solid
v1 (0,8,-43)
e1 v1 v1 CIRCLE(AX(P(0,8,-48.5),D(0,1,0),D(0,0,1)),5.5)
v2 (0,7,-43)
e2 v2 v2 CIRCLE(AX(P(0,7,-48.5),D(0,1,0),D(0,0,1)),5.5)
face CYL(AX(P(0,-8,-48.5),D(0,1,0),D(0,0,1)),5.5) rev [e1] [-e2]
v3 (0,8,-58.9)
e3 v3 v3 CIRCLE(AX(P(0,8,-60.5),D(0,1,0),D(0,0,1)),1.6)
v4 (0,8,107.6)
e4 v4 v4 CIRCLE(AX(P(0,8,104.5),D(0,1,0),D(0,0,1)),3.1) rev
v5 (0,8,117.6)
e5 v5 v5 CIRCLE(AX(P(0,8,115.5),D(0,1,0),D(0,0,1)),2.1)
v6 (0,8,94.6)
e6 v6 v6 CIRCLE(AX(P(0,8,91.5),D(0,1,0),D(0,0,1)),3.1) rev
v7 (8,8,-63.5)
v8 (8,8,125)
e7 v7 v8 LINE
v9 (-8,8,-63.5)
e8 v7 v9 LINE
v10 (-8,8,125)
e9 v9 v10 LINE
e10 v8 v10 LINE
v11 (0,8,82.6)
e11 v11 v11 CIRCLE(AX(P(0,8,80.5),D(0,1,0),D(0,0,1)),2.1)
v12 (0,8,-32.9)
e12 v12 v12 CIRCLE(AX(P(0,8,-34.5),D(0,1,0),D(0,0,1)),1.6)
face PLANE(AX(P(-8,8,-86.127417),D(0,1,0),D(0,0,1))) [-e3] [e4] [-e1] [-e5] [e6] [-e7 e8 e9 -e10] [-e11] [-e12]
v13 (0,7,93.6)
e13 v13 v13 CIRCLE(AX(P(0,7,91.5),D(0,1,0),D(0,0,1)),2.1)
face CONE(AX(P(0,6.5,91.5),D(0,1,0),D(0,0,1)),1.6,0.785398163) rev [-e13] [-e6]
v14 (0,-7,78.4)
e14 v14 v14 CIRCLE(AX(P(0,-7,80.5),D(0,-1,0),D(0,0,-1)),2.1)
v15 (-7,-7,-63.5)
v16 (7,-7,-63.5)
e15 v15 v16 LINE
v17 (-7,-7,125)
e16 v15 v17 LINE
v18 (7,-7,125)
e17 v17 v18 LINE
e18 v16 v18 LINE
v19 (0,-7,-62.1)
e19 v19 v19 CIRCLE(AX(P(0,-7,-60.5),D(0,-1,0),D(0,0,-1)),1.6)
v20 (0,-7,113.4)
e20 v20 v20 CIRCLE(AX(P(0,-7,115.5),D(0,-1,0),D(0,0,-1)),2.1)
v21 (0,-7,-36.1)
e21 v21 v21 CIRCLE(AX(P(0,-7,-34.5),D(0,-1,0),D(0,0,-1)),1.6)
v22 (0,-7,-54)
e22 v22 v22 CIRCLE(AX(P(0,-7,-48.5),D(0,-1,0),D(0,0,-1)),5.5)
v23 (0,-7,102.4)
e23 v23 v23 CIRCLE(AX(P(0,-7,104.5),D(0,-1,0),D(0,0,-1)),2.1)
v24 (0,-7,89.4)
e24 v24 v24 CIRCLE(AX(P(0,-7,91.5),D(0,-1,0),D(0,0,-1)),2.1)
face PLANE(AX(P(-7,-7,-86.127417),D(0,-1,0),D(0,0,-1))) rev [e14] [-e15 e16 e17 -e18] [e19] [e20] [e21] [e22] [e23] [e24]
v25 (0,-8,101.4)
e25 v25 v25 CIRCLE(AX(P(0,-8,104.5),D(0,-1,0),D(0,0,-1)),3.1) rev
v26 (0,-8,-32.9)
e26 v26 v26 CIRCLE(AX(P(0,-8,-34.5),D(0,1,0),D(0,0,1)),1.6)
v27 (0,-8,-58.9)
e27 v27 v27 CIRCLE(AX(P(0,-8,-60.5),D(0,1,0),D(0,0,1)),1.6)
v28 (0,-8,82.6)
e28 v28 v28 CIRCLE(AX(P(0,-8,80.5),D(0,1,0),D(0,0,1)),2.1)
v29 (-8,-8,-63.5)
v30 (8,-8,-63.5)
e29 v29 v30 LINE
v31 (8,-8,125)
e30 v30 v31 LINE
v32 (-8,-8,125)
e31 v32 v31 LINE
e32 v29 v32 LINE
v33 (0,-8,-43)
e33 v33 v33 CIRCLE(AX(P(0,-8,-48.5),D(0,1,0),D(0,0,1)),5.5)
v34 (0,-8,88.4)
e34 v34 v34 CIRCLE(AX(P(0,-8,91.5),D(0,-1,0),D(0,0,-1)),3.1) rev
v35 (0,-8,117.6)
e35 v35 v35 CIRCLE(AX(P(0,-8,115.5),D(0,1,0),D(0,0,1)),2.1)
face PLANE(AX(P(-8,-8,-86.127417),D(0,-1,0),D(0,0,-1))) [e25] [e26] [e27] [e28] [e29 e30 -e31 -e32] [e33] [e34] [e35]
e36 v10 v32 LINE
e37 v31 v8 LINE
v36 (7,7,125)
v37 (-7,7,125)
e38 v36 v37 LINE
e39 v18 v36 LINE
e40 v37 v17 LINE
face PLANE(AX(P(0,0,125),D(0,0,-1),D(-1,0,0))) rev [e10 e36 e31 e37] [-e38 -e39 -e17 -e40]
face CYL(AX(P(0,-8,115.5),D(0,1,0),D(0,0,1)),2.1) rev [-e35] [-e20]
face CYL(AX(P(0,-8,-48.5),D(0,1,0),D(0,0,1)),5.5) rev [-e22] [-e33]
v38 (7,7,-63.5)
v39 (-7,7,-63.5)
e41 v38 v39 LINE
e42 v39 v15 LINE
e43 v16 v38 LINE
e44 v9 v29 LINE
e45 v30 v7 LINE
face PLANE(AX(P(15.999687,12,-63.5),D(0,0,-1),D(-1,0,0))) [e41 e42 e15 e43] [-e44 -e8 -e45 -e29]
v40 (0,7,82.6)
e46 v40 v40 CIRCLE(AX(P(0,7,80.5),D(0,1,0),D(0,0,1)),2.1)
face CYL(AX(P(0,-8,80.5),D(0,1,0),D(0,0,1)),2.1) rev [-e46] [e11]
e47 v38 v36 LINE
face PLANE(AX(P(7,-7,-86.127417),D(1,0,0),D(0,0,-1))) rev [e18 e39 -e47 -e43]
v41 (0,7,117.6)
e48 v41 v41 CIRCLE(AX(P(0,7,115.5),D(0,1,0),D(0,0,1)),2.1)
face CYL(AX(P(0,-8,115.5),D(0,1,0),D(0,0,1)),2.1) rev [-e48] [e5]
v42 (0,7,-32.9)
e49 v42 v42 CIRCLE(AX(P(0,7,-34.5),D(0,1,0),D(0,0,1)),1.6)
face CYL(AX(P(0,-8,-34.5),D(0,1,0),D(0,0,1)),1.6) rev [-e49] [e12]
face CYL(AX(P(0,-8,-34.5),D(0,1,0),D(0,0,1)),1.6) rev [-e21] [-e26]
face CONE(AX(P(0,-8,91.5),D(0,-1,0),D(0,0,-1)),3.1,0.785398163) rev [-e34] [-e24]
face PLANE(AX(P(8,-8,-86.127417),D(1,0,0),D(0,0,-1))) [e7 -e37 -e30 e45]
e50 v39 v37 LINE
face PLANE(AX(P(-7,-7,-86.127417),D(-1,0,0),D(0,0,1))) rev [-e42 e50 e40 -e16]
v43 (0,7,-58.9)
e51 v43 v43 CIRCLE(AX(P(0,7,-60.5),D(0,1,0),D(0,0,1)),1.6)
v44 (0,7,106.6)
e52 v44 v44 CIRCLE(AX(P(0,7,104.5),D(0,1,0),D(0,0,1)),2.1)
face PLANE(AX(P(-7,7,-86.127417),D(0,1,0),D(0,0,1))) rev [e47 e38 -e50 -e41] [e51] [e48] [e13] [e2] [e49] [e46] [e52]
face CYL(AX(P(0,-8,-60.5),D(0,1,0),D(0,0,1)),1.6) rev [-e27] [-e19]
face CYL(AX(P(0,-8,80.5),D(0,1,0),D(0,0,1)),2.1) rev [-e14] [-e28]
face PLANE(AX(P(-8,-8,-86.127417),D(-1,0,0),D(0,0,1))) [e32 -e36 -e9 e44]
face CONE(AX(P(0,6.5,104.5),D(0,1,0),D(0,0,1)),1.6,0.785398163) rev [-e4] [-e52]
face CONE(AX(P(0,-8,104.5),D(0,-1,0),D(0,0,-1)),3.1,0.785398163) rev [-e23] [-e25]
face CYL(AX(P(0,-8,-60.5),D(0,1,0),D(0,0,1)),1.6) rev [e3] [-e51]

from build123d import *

# Parameters (mm, degrees)
BOSS_EXTRUDE1_DEPTH      = 125
BOSS_EXTRUDE1_DEPTH_BACK = 63.5
SKETCH1_W                = 16
SKETCH1_H                = 16
SKETCH1_W_2              = 14
SKETCH1_H_2              = 14
SKETCH2_R                = 2.1
SKETCH2_R_2              = 1.6
SKETCH2_R_3              = 5.5
CUT_EXTRUDE1_DEPTH       = 127.273512662
CHAMFER1_SIZE            = 1.5


with BuildPart() as part:
    # Sketch1 → Boss-Extrude1 (new, two sides: drawn at the far end of the back side and taken through both)
    with BuildSketch(Plane.XY.offset(-BOSS_EXTRUDE1_DEPTH_BACK)):
        Rectangle(SKETCH1_W, SKETCH1_H)
        Rectangle(SKETCH1_W_2, SKETCH1_H_2, mode=Mode.SUBTRACT)
    extrude(amount=BOSS_EXTRUDE1_DEPTH + BOSS_EXTRUDE1_DEPTH_BACK)

    # Sketch2 → Cut-Extrude1 (cut, through all)
    with BuildSketch(Plane(origin=(0, 8, 0), x_dir=(1, 0, 0), z_dir=(0, 1, 0))):
        with Locations(Location((0, -115.5, 0), (0, 0, 270))):
            Circle(SKETCH2_R)
        with Locations(Location((0, -104.5, 0), (0, 0, 270))):
            Circle(SKETCH2_R_2)
        with Locations(Location((0, 48.5, 0), (0, 0, 270))):
            Circle(SKETCH2_R_3)
        with Locations(Location((0, 60.5, 0), (0, 0, 270))):
            Circle(SKETCH2_R_2)
        with Locations(Location((0, 34.5, 0), (0, 0, 270))):
            Circle(SKETCH2_R_2)
        with Locations(Location((0, -80.5, 0), (0, 0, 270))):
            Circle(SKETCH2_R)
        with Locations(Location((0, -91.5, 0), (0, 0, 270))):
            Circle(SKETCH2_R_2)
    extrude(amount=-CUT_EXTRUDE1_DEPTH, mode=Mode.SUBTRACT)

    # Chamfer1
    # the kernel refuses this chamfer: 1.5 mm, written as the material it takes off along each edge
    with BuildSketch(Plane(origin=(0, 8, 104.5), x_dir=(0, 0, 1), z_dir=(-1, 0, 0))) as chamfer1_piece_1:
        Polygon((1.6 + CHAMFER1_SIZE, 0), (1.6, -CHAMFER1_SIZE), (1.6, 0), align=None)
    revolve(axis=Axis((0, 8, 104.5), (0, 1, 0)), mode=Mode.SUBTRACT)
    with BuildSketch(Plane(origin=(0, 8, 91.5), x_dir=(0, 0, 1), z_dir=(-1, 0, 0))) as chamfer1_piece_2:
        Polygon((1.6 + CHAMFER1_SIZE, 0), (1.6, -CHAMFER1_SIZE), (1.6, 0), align=None)
    revolve(axis=Axis((0, 8, 91.5), (0, 1, 0)), mode=Mode.SUBTRACT)
    with BuildSketch(Plane(origin=(0, -8, 104.5), x_dir=(0, 0, 1), z_dir=(-1, 0, 0))) as chamfer1_piece_3:
        Polygon((1.6 + CHAMFER1_SIZE, 0), (1.6, CHAMFER1_SIZE), (1.6, 0), align=None)
    revolve(axis=Axis((0, -8, 104.5), (0, 1, 0)), mode=Mode.SUBTRACT)
    with BuildSketch(Plane(origin=(0, -8, 91.5), x_dir=(0, 0, 1), z_dir=(-1, 0, 0))) as chamfer1_piece_4:
        Polygon((1.6 + CHAMFER1_SIZE, 0), (1.6, CHAMFER1_SIZE), (1.6, 0), align=None)
    revolve(axis=Axis((0, -8, 91.5), (0, 1, 0)), mode=Mode.SUBTRACT)


solid = part.part
